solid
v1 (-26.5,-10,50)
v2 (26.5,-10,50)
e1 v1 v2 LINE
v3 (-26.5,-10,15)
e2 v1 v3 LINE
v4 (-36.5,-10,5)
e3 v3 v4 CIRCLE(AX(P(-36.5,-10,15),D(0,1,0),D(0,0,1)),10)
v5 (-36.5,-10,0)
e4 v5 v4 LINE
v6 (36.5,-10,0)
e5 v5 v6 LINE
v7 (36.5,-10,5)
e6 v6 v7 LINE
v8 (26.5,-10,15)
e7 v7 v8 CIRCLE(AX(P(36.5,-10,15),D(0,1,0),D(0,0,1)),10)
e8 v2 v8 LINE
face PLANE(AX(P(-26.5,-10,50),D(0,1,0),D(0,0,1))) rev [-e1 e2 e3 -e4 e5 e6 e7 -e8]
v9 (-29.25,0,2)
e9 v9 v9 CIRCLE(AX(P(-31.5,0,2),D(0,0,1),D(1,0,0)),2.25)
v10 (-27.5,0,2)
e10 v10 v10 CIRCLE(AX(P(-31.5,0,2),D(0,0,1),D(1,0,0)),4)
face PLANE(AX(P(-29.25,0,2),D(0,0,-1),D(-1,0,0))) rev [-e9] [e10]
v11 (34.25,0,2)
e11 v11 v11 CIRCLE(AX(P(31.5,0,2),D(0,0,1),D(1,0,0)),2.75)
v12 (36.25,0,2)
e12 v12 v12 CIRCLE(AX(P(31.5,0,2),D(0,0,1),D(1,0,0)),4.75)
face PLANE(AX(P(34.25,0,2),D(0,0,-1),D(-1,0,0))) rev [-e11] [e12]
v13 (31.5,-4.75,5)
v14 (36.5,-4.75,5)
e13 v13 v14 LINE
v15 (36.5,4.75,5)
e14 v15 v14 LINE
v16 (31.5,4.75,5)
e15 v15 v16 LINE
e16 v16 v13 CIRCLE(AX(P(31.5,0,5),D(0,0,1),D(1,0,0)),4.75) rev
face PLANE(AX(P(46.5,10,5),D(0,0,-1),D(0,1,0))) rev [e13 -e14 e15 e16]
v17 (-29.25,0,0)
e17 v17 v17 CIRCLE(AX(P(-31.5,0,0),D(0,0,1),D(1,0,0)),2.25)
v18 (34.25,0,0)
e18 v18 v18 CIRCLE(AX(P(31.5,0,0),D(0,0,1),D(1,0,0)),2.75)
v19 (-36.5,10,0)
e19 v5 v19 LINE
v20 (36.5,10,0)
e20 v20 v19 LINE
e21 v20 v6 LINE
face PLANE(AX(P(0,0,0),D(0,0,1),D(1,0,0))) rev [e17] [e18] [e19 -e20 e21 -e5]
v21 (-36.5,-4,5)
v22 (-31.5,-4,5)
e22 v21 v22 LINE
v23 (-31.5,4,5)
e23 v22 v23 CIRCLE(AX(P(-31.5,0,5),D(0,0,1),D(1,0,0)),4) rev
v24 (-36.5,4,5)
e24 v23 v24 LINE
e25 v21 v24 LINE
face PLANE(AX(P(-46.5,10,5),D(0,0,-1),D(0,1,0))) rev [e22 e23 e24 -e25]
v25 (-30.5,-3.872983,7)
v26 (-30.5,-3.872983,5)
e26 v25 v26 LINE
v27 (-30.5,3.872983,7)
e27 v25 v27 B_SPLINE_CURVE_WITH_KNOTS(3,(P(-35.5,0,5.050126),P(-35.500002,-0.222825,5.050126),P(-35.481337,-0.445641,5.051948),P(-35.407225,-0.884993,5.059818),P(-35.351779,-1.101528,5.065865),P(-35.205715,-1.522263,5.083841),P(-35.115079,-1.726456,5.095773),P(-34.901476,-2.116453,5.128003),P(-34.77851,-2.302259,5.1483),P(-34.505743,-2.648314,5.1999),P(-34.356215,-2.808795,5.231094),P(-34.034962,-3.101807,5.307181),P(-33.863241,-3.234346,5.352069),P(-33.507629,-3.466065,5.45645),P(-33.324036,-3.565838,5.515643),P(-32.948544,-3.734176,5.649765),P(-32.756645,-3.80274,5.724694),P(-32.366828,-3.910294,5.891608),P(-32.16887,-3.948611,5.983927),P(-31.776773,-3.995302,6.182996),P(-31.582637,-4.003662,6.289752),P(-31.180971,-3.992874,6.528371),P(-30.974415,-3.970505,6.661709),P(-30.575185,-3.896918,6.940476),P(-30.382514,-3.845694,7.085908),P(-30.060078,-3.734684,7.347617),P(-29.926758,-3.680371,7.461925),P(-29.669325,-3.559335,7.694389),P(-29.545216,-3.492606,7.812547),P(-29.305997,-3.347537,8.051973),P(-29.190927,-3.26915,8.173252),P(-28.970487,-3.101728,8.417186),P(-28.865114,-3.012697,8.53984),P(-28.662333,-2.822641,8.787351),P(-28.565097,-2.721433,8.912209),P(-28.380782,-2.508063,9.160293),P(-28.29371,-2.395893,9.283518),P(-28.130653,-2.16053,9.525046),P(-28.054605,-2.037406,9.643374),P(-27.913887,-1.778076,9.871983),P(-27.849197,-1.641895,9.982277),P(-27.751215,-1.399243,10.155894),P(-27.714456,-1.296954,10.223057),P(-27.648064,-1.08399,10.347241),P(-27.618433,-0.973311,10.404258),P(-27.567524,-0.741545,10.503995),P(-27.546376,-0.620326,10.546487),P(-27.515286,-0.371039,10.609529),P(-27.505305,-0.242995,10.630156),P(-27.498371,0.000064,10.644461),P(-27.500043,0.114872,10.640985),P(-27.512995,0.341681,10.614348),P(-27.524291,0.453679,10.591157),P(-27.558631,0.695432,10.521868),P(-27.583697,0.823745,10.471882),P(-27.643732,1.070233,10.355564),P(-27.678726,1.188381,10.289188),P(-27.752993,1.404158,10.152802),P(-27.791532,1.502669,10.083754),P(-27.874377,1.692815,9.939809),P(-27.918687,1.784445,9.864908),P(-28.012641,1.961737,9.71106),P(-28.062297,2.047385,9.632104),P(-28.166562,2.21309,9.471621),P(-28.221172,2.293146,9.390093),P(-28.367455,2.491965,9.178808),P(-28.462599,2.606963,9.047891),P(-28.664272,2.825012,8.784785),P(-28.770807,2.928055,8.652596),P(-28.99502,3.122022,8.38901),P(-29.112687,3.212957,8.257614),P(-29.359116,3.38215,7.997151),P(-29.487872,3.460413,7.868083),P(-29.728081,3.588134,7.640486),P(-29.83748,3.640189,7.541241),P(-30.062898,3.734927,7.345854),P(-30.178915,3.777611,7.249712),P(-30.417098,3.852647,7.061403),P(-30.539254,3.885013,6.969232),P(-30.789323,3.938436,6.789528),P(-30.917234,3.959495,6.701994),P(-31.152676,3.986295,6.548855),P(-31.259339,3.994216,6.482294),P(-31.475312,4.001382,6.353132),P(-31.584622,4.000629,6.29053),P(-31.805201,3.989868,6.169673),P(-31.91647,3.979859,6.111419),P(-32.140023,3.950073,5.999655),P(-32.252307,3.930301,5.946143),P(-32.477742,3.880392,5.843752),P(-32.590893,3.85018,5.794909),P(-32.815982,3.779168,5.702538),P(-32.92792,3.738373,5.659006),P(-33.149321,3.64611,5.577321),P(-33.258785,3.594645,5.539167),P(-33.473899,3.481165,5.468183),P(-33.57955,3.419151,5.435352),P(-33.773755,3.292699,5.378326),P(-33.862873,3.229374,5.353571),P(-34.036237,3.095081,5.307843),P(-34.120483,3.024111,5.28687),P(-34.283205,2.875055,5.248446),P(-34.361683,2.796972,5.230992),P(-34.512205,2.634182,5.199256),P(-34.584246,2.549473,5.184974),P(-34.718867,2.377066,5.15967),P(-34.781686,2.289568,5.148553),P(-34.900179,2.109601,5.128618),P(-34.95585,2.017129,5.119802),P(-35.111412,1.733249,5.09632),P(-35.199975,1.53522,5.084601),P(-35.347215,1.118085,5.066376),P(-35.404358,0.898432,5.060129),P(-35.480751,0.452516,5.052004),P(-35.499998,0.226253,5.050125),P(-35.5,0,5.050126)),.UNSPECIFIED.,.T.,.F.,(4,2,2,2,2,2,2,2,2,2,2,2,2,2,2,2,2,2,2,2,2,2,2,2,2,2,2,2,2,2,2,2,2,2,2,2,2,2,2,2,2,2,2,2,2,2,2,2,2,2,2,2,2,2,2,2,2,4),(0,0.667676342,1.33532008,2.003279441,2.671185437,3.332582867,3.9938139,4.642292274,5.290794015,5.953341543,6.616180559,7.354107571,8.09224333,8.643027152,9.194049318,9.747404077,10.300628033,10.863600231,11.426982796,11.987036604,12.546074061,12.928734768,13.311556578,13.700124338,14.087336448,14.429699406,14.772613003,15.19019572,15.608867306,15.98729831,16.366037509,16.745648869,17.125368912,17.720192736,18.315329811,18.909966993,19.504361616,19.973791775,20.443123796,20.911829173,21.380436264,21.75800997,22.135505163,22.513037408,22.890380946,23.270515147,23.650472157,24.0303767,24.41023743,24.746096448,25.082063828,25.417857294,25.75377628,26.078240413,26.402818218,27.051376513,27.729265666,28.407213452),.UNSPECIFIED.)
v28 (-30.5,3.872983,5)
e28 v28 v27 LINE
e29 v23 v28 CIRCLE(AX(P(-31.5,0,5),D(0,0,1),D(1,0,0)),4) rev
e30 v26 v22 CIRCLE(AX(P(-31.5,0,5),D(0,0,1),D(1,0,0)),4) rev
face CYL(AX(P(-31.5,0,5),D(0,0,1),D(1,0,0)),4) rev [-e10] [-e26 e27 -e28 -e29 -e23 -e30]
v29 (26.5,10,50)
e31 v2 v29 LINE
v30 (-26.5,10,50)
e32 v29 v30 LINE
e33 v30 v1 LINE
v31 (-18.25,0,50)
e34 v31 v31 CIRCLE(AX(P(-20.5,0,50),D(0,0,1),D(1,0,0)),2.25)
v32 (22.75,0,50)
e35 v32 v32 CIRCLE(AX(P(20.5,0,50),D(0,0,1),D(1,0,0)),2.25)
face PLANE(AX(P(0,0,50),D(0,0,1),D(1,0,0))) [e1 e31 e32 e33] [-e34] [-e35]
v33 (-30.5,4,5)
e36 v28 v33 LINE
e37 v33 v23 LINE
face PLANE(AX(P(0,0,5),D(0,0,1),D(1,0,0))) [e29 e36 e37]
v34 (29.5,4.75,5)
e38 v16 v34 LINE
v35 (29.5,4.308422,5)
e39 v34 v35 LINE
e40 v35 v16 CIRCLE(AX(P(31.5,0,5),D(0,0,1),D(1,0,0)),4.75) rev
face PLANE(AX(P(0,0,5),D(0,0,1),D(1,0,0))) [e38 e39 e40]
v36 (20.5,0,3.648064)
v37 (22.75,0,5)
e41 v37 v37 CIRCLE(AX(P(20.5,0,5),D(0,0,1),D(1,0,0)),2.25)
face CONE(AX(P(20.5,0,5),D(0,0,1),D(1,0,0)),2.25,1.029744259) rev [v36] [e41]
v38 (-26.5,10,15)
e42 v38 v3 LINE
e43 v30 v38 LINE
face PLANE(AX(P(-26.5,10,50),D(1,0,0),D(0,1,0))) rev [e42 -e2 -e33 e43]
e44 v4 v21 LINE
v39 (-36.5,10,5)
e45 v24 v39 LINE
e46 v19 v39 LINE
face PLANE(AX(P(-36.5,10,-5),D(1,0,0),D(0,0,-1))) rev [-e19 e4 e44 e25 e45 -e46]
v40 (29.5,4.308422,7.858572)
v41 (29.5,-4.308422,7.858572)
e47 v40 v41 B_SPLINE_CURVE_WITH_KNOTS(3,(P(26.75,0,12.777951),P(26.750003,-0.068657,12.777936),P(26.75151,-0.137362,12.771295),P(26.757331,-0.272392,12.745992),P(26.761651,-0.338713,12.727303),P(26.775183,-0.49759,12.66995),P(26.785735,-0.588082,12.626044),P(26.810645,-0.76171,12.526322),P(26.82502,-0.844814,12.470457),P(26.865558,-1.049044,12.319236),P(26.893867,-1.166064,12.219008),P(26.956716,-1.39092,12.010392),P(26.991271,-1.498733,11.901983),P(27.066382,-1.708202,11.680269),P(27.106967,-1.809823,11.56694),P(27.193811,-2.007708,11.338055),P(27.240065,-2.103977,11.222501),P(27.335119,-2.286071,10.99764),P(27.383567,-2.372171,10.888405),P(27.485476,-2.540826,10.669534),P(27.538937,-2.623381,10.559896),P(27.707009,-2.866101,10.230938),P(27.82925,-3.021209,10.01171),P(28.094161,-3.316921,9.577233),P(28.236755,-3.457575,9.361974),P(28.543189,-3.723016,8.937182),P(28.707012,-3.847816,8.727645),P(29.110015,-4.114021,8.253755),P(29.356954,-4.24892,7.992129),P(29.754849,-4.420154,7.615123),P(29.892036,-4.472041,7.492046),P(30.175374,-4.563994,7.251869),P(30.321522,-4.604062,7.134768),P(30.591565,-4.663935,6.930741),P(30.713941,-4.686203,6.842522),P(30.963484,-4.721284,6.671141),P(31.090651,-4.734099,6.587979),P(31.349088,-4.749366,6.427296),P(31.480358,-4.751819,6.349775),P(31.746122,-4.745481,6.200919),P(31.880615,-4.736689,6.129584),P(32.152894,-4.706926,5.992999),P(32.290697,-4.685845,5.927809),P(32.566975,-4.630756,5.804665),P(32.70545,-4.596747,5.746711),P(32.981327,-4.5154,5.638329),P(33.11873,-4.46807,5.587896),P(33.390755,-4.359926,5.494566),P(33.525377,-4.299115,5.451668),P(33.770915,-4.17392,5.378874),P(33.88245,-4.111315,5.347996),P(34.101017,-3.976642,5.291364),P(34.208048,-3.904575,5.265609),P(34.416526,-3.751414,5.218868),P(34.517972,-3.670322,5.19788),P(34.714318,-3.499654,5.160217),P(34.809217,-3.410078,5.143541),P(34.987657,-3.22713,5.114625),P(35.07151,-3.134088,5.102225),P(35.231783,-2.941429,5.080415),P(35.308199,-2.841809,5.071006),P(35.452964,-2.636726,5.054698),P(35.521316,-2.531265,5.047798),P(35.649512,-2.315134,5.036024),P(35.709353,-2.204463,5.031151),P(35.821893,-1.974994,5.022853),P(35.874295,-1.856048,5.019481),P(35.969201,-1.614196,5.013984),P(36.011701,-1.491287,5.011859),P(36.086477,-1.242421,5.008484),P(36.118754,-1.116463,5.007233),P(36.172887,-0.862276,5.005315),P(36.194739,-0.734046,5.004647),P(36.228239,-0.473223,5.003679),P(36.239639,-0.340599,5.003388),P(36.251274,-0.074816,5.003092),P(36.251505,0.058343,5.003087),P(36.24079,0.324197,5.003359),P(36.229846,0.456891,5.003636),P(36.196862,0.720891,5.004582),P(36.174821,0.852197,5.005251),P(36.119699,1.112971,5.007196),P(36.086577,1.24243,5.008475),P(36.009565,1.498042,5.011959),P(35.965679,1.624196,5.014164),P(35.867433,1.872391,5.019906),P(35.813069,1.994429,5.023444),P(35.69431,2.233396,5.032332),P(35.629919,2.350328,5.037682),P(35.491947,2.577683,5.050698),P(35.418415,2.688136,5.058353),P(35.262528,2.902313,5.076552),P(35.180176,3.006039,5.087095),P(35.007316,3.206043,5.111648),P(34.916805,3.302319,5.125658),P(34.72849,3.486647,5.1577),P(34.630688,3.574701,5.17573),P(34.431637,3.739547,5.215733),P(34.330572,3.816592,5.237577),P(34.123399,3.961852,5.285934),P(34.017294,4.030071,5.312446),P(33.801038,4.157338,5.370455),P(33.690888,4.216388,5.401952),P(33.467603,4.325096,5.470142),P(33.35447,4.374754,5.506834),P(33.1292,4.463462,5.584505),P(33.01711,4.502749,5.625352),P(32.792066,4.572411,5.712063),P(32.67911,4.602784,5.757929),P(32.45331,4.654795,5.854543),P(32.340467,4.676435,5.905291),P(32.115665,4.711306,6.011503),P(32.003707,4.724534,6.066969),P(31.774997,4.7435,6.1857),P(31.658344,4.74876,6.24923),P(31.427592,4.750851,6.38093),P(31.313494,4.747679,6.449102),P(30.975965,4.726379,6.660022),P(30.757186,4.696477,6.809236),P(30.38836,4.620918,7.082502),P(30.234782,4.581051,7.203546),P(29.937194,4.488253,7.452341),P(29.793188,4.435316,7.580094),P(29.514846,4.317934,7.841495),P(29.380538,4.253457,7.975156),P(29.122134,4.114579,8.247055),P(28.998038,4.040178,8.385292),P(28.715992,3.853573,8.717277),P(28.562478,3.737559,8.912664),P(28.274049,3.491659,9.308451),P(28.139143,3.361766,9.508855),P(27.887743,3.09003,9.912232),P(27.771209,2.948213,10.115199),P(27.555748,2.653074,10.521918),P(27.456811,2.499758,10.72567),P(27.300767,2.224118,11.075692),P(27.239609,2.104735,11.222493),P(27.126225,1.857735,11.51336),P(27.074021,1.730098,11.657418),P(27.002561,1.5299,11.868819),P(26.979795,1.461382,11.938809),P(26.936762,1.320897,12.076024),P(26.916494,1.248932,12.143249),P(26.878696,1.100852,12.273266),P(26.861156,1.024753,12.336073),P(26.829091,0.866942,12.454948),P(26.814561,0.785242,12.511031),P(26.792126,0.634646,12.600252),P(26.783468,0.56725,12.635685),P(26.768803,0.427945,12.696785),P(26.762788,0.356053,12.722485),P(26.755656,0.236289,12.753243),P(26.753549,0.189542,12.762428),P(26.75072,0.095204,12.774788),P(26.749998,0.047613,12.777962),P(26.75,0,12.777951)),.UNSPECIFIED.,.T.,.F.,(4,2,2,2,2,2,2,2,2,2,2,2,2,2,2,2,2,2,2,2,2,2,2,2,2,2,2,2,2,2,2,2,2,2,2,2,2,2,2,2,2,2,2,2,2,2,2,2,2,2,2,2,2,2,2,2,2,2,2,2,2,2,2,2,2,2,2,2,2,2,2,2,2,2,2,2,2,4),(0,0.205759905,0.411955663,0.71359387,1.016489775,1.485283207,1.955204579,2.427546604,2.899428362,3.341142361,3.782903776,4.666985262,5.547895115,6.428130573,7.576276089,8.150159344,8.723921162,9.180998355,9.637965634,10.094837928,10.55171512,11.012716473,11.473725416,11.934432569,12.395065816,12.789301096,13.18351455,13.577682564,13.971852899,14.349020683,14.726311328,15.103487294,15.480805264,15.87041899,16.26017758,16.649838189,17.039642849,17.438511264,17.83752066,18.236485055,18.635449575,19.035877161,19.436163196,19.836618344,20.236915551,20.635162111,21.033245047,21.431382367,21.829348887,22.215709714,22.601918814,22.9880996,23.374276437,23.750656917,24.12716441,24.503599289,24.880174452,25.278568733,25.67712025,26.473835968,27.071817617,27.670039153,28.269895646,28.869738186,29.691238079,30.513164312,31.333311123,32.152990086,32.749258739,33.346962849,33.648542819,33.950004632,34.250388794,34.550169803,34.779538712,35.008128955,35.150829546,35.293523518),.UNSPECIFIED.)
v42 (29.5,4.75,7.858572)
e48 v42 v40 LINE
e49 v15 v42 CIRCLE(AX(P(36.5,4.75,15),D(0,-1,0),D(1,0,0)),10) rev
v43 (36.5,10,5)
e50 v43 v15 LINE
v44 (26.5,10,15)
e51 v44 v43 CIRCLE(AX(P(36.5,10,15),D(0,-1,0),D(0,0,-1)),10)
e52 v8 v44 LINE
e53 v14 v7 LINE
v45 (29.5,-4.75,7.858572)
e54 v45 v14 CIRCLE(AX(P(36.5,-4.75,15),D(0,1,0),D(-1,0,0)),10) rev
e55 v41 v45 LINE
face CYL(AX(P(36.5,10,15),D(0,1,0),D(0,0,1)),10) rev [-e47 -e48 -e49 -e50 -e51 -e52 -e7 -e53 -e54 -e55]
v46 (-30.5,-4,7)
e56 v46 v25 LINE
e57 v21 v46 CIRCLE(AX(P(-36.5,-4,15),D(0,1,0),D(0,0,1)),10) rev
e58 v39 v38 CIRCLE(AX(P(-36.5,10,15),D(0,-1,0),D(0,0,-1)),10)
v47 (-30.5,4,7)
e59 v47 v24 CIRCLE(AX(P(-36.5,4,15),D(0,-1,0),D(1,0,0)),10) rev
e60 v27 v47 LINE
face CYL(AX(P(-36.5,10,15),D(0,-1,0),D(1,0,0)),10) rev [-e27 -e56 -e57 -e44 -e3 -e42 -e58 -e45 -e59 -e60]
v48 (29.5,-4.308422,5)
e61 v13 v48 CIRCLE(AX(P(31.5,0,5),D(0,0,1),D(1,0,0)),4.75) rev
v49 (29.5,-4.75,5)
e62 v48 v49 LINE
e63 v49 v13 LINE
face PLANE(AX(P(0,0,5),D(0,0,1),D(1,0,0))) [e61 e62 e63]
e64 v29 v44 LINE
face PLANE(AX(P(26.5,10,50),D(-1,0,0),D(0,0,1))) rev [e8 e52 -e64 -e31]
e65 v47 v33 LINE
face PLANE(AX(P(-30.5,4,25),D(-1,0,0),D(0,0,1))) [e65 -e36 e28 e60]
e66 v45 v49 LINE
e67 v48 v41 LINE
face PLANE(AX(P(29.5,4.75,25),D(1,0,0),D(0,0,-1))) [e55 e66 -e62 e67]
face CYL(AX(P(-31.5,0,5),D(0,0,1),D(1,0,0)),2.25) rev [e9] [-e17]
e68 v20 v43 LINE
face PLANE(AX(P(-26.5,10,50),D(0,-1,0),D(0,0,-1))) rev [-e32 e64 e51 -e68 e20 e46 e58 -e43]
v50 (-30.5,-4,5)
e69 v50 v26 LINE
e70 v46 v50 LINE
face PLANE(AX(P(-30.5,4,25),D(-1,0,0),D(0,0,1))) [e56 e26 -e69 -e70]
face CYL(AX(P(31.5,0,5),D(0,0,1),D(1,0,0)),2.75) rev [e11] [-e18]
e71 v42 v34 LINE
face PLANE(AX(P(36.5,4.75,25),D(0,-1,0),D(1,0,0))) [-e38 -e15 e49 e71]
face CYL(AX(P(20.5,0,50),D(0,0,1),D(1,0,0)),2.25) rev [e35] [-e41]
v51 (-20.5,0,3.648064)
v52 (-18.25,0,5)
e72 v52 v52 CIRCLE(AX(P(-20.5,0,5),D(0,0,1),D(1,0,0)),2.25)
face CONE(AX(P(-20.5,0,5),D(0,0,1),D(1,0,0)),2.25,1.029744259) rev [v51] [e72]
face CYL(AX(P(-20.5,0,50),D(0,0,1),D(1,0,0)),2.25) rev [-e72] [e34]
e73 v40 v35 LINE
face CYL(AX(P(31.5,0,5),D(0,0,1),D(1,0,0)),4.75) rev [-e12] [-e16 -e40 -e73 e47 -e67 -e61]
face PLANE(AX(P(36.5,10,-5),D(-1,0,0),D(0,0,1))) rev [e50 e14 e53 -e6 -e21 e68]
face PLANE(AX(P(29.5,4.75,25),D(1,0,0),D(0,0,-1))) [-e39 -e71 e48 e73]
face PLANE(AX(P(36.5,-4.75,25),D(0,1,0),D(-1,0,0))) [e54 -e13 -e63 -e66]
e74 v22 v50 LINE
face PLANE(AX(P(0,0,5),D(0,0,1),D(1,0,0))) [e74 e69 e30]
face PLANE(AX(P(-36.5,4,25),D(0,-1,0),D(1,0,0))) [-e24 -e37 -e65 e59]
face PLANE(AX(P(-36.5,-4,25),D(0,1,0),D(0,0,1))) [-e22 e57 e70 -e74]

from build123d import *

# Parameters (mm, degrees)
SKETCH_1_W                     = 53
SKETCH_1_H                     = 20
EXTRUDE_1_DEPTH                = 50
HOLE_WIZARD_M5_1_D             = 4.5
HOLE_WIZARD_M5_1_DEPTH         = 45
HOLE_WIZARD_M5_1_TIP           = 1.351936393
SKETCH_4_W                     = 5
SKETCH_4_H                     = 20
EXTRUDE_2_DEPTH                = 20
HOLE_WIZARD_M4_1_D             = 4.5
HOLE_WIZARD_M4_1_DEPTH         = 15
HOLE_WIZARD_M4_1_CBORE_D       = 8
HOLE_WIZARD_M4_1_CBORE_DEPTH   = 3
HOLE_WIZARD_M4_1_TIP           = 1.351936393
SKETCH_7_W                     = 5
SKETCH_7_H                     = 20
EXTRUDE_3_DEPTH                = 20
HOLE_WIZARD_M5_1_2_D           = 5.5
HOLE_WIZARD_M5_1_2_DEPTH       = 15
HOLE_WIZARD_M5_1_2_CBORE_D     = 9.5
HOLE_WIZARD_M5_1_2_CBORE_DEPTH = 3
HOLE_WIZARD_M5_1_2_TIP         = 1.652366702
FILLET_1_R                     = 10
SKETCH_10_W                    = 6
SKETCH_10_H                    = 8
SKETCH_10_W_2                  = 7
SKETCH_10_H_2                  = 9.5
CUT_EXTRUDE_1_DEPTH            = 20
SKETCH_11_W                    = 10
SKETCH_11_H                    = 20
CUT_EXTRUDE_2_DEPTH            = 10


with BuildPart() as part:
    # 스케치1 → 보스-돌출1 (new body)
    with BuildSketch(Plane.XY):
        Rectangle(SKETCH_1_W, SKETCH_1_H)
    extrude(amount=EXTRUDE_1_DEPTH)

    # Hole Wizard M5 _ _1
    with Locations(Plane.XY.offset(50)):
        with Locations((20.5, 0), (-20.5, 0)):
            Hole(HOLE_WIZARD_M5_1_D / 2, depth=HOLE_WIZARD_M5_1_DEPTH)
            with Locations((0, 0, -(HOLE_WIZARD_M5_1_DEPTH + HOLE_WIZARD_M5_1_TIP / 2))):  # 118° drill point
                Cone(0, HOLE_WIZARD_M5_1_D / 2, HOLE_WIZARD_M5_1_TIP, mode=Mode.SUBTRACT)

    # 스케치4 → 보스-돌출2 (add)
    with BuildSketch(Plane.ZY.offset(26.5)):
        with Locations((2.5, 0)):
            Rectangle(SKETCH_4_W, SKETCH_4_H)
    extrude(amount=EXTRUDE_2_DEPTH)

    # M4 소켓 머리 캡 나사용 카운터보어1
    with Locations(Plane.XY.offset(5)):
        with Locations((-31.5, 0)):
            CounterBoreHole(HOLE_WIZARD_M4_1_D / 2, HOLE_WIZARD_M4_1_CBORE_D / 2, HOLE_WIZARD_M4_1_CBORE_DEPTH, depth=HOLE_WIZARD_M4_1_DEPTH)
            with Locations((0, 0, -(HOLE_WIZARD_M4_1_DEPTH + HOLE_WIZARD_M4_1_TIP / 2))):  # 118° drill point
                Cone(0, HOLE_WIZARD_M4_1_D / 2, HOLE_WIZARD_M4_1_TIP, mode=Mode.SUBTRACT)

    # 스케치7 → 보스-돌출3 (add)
    with BuildSketch(Plane(origin=(26.5, 0, 0), x_dir=(0, 0, -1), z_dir=(1, 0, 0))):
        with Locations((-2.5, 0)):
            Rectangle(SKETCH_7_W, SKETCH_7_H)
    extrude(amount=EXTRUDE_3_DEPTH)

    # Hole Wizard M5 _ _ _ _ _1 2
    with Locations(Plane.XY.offset(5)):
        with Locations((31.5, 0)):
            CounterBoreHole(HOLE_WIZARD_M5_1_2_D / 2, HOLE_WIZARD_M5_1_2_CBORE_D / 2, HOLE_WIZARD_M5_1_2_CBORE_DEPTH, depth=HOLE_WIZARD_M5_1_2_DEPTH)
            with Locations((0, 0, -(HOLE_WIZARD_M5_1_2_DEPTH + HOLE_WIZARD_M5_1_2_TIP / 2))):  # 118° drill point
                Cone(0, HOLE_WIZARD_M5_1_2_D / 2, HOLE_WIZARD_M5_1_2_TIP, mode=Mode.SUBTRACT)

    # 필렛1
    # the kernel refuses this fillet: 10 mm, written as the material it adds along each edge
    with BuildSketch(Plane(origin=(-26.5, 10, 5), x_dir=(0, 0, 1), z_dir=(0, -1, 0))) as fillet_1_piece_1_section:
        with BuildLine():
            CenterArc((FILLET_1_R, FILLET_1_R), FILLET_1_R, 180, 90)
            Line((0, FILLET_1_R), (0, 0))
            Line((0, 0), (FILLET_1_R, 0))
        make_face()
    fillet_1_piece_1 = extrude(amount=20, mode=Mode.PRIVATE)
    fillet_1_piece_1 = fillet_1_piece_1 - Plane(origin=(-31.5, 0, 12.39249306), x_dir=(1, 0, 0), z_dir=(0, 0, 1)) * Cylinder(4, 81, mode=Mode.PRIVATE)
    add(fillet_1_piece_1)
    with BuildSketch(Plane(origin=(26.5, 10, 5), x_dir=(0, 0, 1), z_dir=(0, -1, 0))) as fillet_1_piece_2_section:
        with BuildLine():
            CenterArc((FILLET_1_R, -FILLET_1_R), FILLET_1_R, 90, 90)
            Line((0, -FILLET_1_R), (0, 0))
            Line((0, 0), (FILLET_1_R, 0))
        make_face()
    fillet_1_piece_2 = extrude(amount=20, mode=Mode.PRIVATE)
    fillet_1_piece_2 = fillet_1_piece_2 - Plane(origin=(31.5, 0, 12.393306283), x_dir=(1, 0, 0), z_dir=(0, 0, 1)) * Cylinder(4.75, 80, mode=Mode.PRIVATE)
    add(fillet_1_piece_2)

    # 스케치10 → 컷-돌출1 (cut)
    with BuildSketch(Plane.XY.offset(5)):
        with Locations((-33.5, 0)):
            Rectangle(SKETCH_10_W, SKETCH_10_H)
        with Locations((33, 0)):
            Rectangle(SKETCH_10_W_2, SKETCH_10_H_2)
    extrude(amount=CUT_EXTRUDE_1_DEPTH, mode=Mode.SUBTRACT)

    # 스케치11 → 컷-돌출2 (cut)
    with BuildSketch(Plane.XY.offset(5)):
        with Locations((-41.5, 0)):
            Rectangle(SKETCH_11_W, SKETCH_11_H)
        with Locations((41.5, 0)):
            Rectangle(SKETCH_11_W, SKETCH_11_H)
    extrude(amount=-CUT_EXTRUDE_2_DEPTH, mode=Mode.SUBTRACT)


solid = part.part
